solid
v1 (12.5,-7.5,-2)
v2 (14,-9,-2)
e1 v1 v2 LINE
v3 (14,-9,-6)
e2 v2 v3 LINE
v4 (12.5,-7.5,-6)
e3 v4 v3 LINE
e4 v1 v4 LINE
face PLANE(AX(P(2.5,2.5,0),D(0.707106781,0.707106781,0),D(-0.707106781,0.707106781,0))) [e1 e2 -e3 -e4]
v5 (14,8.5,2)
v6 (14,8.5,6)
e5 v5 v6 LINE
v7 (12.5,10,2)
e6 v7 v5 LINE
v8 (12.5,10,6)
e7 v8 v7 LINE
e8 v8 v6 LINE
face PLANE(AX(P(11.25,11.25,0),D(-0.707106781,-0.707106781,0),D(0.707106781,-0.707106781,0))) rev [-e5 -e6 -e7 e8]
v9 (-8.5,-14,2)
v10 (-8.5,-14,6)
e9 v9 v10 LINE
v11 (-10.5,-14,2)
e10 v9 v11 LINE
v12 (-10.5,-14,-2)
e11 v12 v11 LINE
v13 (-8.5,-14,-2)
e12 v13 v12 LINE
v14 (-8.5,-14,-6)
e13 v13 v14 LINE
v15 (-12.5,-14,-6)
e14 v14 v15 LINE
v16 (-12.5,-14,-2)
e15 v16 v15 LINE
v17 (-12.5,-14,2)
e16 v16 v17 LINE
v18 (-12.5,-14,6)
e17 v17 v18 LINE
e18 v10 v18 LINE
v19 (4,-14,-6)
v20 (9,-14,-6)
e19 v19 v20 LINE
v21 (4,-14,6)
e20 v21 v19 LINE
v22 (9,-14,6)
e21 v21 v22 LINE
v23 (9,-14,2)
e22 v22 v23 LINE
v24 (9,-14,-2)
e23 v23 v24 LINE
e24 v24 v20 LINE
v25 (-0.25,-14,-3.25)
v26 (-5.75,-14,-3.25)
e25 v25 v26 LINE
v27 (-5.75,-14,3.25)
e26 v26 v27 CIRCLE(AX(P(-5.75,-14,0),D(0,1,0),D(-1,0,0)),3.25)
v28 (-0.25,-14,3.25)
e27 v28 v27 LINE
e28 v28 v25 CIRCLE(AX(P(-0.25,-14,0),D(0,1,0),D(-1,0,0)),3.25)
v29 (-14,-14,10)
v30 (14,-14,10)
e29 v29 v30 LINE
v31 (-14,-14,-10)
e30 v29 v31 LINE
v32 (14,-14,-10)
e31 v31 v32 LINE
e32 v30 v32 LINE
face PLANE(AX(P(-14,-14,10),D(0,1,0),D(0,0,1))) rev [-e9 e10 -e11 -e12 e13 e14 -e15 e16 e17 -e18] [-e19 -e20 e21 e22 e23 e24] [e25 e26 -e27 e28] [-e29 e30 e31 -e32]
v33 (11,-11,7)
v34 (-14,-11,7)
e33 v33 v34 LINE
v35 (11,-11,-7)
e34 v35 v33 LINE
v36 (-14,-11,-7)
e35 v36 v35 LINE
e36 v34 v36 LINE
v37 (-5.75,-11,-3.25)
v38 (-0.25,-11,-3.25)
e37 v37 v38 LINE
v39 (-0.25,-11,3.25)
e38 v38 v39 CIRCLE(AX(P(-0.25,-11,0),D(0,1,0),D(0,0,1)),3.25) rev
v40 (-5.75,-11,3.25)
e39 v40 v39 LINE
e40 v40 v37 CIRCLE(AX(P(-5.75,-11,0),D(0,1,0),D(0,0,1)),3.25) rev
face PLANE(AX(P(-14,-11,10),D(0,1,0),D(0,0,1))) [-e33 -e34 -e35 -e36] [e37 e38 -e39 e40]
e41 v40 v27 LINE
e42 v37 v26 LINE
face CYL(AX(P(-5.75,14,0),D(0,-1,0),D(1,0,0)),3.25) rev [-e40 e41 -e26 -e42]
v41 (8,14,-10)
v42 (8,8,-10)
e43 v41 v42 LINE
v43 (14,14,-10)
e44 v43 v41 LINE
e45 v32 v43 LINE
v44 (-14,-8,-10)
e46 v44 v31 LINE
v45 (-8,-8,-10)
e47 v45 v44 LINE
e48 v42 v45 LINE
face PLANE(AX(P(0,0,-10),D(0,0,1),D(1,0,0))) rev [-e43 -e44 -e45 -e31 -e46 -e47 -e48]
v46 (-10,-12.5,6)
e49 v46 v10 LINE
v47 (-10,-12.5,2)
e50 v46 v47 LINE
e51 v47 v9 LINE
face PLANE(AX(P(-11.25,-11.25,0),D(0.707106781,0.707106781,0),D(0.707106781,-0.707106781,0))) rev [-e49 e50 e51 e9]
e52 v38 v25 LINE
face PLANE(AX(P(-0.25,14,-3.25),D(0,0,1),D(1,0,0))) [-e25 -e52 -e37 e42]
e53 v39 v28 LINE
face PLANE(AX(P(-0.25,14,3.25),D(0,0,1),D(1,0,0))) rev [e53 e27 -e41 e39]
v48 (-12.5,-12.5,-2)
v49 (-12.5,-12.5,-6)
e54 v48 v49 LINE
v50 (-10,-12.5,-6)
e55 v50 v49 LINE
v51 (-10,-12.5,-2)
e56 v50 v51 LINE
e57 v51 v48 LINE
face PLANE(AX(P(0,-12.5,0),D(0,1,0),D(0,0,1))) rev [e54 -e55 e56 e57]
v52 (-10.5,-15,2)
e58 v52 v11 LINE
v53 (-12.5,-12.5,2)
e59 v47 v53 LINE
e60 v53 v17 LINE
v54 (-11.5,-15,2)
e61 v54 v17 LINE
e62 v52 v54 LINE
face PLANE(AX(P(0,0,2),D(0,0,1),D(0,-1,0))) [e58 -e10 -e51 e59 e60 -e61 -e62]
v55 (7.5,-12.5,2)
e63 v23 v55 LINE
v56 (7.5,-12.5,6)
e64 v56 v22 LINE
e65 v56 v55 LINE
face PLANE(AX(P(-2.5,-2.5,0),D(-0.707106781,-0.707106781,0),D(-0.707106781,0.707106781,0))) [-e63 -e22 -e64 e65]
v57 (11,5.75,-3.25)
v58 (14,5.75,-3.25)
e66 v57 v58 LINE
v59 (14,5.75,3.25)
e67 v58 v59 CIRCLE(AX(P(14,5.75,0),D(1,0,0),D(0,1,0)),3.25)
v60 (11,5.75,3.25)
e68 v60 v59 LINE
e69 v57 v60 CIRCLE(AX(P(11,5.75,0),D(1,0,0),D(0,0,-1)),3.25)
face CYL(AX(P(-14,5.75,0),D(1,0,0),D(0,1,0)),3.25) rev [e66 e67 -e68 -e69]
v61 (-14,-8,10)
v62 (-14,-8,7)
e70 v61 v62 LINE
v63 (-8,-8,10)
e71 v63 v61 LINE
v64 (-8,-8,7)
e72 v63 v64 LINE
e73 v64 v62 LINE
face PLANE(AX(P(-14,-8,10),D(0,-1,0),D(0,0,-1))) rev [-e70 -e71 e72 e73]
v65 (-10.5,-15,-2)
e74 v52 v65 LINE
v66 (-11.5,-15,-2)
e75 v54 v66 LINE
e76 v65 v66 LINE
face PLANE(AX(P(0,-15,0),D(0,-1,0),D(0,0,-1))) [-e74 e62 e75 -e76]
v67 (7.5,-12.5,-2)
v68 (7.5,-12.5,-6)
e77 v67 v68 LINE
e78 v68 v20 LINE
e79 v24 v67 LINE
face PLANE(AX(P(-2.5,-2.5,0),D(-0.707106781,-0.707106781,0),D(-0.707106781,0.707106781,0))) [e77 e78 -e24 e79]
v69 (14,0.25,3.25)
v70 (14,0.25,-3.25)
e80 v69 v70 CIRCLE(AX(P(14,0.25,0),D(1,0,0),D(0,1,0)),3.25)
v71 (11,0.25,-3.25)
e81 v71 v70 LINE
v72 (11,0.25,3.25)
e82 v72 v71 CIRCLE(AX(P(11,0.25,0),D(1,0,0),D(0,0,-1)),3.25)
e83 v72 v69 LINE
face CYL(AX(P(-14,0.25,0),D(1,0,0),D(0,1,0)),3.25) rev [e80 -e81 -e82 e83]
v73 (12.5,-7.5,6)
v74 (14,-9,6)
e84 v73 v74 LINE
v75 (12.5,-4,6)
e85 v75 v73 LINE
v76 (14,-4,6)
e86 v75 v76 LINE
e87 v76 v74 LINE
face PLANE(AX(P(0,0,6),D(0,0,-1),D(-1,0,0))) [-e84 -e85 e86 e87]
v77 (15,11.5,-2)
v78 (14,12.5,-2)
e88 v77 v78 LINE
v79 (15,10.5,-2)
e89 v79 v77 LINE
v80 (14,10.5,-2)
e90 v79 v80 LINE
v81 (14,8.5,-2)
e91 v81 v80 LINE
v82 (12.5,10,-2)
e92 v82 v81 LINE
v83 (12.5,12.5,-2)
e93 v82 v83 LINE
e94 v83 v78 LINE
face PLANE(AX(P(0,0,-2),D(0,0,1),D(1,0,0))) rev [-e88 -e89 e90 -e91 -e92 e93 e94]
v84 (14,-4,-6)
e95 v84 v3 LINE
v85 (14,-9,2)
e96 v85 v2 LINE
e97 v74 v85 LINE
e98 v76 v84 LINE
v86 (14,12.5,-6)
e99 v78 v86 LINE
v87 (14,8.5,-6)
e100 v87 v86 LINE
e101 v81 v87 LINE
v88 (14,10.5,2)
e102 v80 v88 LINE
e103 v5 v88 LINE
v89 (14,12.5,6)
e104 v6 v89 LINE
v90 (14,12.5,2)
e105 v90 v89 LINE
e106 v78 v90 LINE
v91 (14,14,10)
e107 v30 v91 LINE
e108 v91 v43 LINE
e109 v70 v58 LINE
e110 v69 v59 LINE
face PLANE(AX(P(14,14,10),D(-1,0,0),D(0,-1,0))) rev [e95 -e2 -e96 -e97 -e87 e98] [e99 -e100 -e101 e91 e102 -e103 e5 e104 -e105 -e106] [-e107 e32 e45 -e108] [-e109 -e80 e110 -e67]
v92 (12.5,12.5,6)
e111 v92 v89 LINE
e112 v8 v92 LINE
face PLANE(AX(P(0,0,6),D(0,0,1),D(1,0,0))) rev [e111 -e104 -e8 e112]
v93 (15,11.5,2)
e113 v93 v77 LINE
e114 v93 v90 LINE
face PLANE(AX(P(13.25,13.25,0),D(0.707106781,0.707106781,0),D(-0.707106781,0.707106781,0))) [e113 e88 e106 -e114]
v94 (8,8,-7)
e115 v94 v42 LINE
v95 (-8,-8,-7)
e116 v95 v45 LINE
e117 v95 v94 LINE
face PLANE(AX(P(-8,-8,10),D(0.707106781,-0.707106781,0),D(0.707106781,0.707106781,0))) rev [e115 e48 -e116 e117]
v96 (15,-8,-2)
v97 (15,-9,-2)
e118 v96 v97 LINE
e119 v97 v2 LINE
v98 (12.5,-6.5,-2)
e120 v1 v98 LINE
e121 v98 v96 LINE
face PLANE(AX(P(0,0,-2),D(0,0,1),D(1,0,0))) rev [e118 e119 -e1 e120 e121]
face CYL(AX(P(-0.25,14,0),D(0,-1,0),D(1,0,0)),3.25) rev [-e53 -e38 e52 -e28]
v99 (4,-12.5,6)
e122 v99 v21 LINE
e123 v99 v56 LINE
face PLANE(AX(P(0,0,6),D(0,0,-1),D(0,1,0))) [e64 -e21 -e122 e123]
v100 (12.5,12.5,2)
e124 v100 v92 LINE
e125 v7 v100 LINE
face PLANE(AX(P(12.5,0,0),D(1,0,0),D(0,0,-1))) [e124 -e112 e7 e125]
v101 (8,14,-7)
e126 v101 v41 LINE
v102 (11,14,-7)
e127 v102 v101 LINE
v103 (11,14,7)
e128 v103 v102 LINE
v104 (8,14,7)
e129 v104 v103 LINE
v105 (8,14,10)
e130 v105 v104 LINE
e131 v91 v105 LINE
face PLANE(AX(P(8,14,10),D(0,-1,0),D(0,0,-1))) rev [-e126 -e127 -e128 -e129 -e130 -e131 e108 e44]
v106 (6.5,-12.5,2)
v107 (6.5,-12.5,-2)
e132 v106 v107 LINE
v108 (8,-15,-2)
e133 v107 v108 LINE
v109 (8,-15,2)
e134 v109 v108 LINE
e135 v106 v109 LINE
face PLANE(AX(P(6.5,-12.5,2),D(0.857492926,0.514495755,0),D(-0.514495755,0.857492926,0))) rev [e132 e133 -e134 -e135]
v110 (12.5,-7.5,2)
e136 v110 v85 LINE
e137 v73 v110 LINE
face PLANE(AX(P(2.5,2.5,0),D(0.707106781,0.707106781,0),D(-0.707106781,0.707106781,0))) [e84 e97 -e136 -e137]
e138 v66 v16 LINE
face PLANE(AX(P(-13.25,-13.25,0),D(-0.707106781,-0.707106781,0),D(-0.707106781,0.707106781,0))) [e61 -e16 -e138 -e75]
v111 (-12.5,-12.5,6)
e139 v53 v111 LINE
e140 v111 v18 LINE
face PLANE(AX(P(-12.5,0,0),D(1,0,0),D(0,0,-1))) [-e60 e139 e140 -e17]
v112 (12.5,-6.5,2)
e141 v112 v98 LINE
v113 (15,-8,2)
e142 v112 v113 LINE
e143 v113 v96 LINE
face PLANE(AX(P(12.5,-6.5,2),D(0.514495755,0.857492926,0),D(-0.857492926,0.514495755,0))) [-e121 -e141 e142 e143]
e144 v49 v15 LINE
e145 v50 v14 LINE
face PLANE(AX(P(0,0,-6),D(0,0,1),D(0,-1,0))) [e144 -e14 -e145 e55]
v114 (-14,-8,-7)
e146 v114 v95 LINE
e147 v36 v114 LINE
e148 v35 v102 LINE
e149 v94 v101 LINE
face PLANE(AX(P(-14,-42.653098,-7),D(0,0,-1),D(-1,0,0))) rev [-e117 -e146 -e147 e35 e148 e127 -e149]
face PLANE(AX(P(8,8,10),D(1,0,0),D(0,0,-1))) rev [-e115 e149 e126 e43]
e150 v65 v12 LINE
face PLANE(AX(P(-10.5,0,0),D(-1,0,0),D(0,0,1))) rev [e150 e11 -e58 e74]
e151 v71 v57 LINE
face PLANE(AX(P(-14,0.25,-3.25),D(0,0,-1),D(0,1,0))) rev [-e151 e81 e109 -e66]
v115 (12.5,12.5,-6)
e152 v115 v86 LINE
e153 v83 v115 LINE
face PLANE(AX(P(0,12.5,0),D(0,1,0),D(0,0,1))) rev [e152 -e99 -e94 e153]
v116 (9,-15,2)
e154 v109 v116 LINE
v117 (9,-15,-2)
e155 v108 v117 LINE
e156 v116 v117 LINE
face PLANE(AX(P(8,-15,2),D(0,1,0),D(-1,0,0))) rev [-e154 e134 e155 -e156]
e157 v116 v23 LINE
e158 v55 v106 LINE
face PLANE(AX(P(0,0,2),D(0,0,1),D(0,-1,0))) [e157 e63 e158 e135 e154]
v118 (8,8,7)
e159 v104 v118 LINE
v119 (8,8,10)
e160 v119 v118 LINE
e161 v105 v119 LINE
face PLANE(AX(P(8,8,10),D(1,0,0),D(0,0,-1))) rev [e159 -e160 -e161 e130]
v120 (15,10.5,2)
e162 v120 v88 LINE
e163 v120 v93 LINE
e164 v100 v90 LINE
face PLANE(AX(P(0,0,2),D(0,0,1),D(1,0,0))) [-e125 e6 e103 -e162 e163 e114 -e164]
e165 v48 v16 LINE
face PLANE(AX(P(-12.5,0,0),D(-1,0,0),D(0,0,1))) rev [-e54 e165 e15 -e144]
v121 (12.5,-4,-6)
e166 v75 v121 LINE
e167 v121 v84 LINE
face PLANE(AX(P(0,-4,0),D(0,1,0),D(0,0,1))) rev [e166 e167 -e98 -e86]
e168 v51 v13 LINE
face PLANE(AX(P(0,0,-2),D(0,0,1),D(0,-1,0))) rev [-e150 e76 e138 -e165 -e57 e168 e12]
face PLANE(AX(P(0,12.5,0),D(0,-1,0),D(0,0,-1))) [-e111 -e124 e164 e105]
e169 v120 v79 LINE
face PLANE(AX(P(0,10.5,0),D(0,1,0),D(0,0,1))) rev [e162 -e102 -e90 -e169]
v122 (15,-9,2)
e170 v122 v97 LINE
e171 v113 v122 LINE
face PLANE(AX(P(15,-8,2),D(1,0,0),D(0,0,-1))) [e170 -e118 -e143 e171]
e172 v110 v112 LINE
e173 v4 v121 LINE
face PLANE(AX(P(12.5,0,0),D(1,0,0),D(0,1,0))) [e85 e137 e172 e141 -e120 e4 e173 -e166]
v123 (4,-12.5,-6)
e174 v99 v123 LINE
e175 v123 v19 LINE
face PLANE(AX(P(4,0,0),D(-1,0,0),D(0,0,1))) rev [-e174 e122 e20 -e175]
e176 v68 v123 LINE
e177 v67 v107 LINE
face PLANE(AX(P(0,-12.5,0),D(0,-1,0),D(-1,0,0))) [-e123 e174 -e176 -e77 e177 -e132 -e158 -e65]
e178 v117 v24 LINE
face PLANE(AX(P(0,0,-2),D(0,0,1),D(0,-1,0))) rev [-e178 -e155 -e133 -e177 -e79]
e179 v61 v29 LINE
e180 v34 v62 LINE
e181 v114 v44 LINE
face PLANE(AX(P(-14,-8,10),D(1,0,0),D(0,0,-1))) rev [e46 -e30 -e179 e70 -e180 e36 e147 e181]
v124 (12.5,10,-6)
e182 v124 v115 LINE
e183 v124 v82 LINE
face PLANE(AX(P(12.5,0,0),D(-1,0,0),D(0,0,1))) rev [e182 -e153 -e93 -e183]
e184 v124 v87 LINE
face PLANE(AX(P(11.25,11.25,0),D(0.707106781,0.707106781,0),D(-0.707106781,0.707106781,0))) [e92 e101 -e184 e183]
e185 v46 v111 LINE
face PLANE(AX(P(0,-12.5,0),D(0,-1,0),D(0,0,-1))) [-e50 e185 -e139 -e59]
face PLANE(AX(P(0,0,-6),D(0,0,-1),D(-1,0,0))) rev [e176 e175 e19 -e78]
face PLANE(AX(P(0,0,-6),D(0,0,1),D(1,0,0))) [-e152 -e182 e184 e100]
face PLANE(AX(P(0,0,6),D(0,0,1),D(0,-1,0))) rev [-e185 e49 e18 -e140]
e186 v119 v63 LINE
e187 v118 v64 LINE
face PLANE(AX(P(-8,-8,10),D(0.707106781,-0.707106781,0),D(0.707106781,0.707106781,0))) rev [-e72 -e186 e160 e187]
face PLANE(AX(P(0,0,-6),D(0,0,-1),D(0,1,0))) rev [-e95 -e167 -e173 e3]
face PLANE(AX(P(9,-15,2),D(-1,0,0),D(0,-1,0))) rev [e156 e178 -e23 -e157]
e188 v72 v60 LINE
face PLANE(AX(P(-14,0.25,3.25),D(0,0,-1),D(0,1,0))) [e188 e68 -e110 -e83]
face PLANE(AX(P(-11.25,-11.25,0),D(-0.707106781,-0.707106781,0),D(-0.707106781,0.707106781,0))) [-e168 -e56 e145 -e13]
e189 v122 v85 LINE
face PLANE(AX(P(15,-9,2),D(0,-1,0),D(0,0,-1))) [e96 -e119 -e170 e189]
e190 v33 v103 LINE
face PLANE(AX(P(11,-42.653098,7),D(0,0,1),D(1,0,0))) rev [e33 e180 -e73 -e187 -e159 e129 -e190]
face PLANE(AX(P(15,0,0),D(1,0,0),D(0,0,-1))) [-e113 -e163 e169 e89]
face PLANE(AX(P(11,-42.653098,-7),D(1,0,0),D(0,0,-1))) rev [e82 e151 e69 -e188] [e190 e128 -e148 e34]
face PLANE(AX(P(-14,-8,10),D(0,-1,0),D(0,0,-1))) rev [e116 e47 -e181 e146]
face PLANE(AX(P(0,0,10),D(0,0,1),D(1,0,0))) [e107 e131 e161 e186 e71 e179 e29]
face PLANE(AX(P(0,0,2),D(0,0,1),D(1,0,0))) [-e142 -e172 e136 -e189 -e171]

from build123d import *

# Parameters (mm, degrees)
EXTRUDE_1_DEPTH     = 10
SKETCH_4_W          = 25
SKETCH_4_H          = 14
CUT_EXTRUDE_1_DEPTH = 25
LOFT_START          = 2
LOFT_2_DEPTH        = 4
EXTRUDE_2_DEPTH     = 2
CUT_EXTRUDE_2_DEPTH = 33.86335345
LOFT_START_2        = -2
LOFT_4_DEPTH        = 4


# Read off the part's stored shape, not the designer's step: 切除-放样2, 放样4
with BuildPart() as part:
    # Sketch 1 → 凸台-拉伸1 (new, symmetric)
    with BuildSketch(Plane.XY):
        Polygon((-14, -8), (-8, -8), (8, 8), (8, 14), (14, 14), (14, -14), (-14, -14), align=None)
    extrude(amount=EXTRUDE_1_DEPTH, both=True)

    # 草图4 → 切除-拉伸1 (cut)
    with BuildSketch(Plane(origin=(0, 14, 0), x_dir=(1, 0, 0), z_dir=(0, 1, 0))):
        with Locations((-1.5, 0)):
            Rectangle(SKETCH_4_W, SKETCH_4_H)
    extrude(amount=-CUT_EXTRUDE_1_DEPTH, mode=Mode.SUBTRACT)

    # Sketch 1 2 → 切除-放样1 section 0
    with BuildSketch(Plane(origin=(12.5, 0, 0), x_dir=(0, 0, -1), z_dir=(1, 0, 0))):
        with BuildLine():
            Line((6, 10), (6, 12.5))
            Line((6, 12.5), (2, 12.5))
            Line((2, 12.5), (2, 10))
            Line((2, 10), (6, 10))
        make_face()
    # 草图2<110> → 切除-放样1 section 1
    with BuildSketch(Plane(origin=(14, 0, 0), x_dir=(0, 0, -1), z_dir=(1, 0, 0))):
        with BuildLine():
            Line((2, 8.5), (6, 8.5))
            Line((6, 8.5), (6, 12.5))
            Line((6, 12.5), (2, 12.5))
            Line((2, 12.5), (2, 8.5))
        make_face()
    loft_1 = loft(mode=Mode.SUBTRACT)

    # 切除-放样2 outline → 切除-放样2 (cut)
    with BuildSketch(Plane.XY.offset(LOFT_START)):
        Polygon((12.5, 12.5), (12.5, 10), (14, 8.5), (14, 12.5), align=None)
    loft_2 = extrude(amount=LOFT_2_DEPTH, mode=Mode.SUBTRACT)

    # 基准面1草图<9> → 切除-放样3 section 0
    with BuildSketch(Plane(origin=(12.5, 0, 0), x_dir=(0, 0, -1), z_dir=(1, 0, 0))):
        with BuildLine():
            Line((-6, -4), (6, -4))
            Line((6, -4), (6, -7.5))
            Line((6, -7.5), (-6, -7.5))
            Line((-6, -7.5), (-6, -4))
        make_face()
    # 草图2<114> → 切除-放样3 section 1
    with BuildSketch(Plane(origin=(14, 0, 0), x_dir=(0, 0, -1), z_dir=(1, 0, 0))):
        with BuildLine():
            Line((-6, -4), (6, -4))
            Line((6, -4), (6, -9))
            Line((6, -9), (-6, -9))
            Line((-6, -9), (-6, -4))
        make_face()
    loft_3 = loft(mode=Mode.SUBTRACT)

    # 草图9 → 凸台-拉伸2 (add, symmetric)
    with BuildSketch(Plane.XY):
        Polygon((15, -8), (15, -9), (12.5, -9), (12.5, -6.5), align=None)
    extrude_2 = extrude(amount=EXTRUDE_2_DEPTH, both=True)

    # 草图2<115> → 切除-拉伸2 (cut, through all)
    with BuildSketch(Plane(origin=(14, 0, 0), x_dir=(0, 0, -1), z_dir=(1, 0, 0))):
        with BuildLine():
            Line((-3.25, 0.25), (-3.25, 5.75))
            ThreePointArc((-3.25, 5.75), (0, 9), (3.25, 5.75))
            Line((3.25, 5.75), (3.25, 0.25))
            ThreePointArc((3.25, 0.25), (0, -3), (-3.25, 0.25))
        make_face()
    cut_extrude_2 = extrude(amount=-CUT_EXTRUDE_2_DEPTH, mode=Mode.SUBTRACT)

    # 放样4 outline → 放样4 (add)
    with BuildSketch(Plane.XY.offset(LOFT_START_2)):
        Polygon((14, 10.5), (15, 10.5), (15, 11.5), (14, 12.5), align=None)
    loft_4 = extrude(amount=LOFT_4_DEPTH)

    # 镜向1: 切除-放样1, 切除-放样2, 切除-放样3, 凸台-拉伸2, 切除-拉伸2, 放样4 across plane
    add(loft_1.mirror(Plane(origin=(0, 0, 0), x_dir=(0, 0, 1), z_dir=(0.7071067811865474, 0.7071067811865477, 0))), mode=Mode.SUBTRACT)
    add(loft_2.mirror(Plane(origin=(0, 0, 0), x_dir=(0, 0, 1), z_dir=(0.7071067811865474, 0.7071067811865477, 0))), mode=Mode.SUBTRACT)
    add(loft_3.mirror(Plane(origin=(0, 0, 0), x_dir=(0, 0, 1), z_dir=(0.7071067811865474, 0.7071067811865477, 0))), mode=Mode.SUBTRACT)
    add(extrude_2.mirror(Plane(origin=(0, 0, 0), x_dir=(0, 0, 1), z_dir=(0.7071067811865474, 0.7071067811865477, 0))))
    add(cut_extrude_2.mirror(Plane(origin=(0, 0, 0), x_dir=(0, 0, 1), z_dir=(0.7071067811865474, 0.7071067811865477, 0))), mode=Mode.SUBTRACT)
    add(loft_4.mirror(Plane(origin=(0, 0, 0), x_dir=(0, 0, 1), z_dir=(0.7071067811865474, 0.7071067811865477, 0))))


solid = part.part
